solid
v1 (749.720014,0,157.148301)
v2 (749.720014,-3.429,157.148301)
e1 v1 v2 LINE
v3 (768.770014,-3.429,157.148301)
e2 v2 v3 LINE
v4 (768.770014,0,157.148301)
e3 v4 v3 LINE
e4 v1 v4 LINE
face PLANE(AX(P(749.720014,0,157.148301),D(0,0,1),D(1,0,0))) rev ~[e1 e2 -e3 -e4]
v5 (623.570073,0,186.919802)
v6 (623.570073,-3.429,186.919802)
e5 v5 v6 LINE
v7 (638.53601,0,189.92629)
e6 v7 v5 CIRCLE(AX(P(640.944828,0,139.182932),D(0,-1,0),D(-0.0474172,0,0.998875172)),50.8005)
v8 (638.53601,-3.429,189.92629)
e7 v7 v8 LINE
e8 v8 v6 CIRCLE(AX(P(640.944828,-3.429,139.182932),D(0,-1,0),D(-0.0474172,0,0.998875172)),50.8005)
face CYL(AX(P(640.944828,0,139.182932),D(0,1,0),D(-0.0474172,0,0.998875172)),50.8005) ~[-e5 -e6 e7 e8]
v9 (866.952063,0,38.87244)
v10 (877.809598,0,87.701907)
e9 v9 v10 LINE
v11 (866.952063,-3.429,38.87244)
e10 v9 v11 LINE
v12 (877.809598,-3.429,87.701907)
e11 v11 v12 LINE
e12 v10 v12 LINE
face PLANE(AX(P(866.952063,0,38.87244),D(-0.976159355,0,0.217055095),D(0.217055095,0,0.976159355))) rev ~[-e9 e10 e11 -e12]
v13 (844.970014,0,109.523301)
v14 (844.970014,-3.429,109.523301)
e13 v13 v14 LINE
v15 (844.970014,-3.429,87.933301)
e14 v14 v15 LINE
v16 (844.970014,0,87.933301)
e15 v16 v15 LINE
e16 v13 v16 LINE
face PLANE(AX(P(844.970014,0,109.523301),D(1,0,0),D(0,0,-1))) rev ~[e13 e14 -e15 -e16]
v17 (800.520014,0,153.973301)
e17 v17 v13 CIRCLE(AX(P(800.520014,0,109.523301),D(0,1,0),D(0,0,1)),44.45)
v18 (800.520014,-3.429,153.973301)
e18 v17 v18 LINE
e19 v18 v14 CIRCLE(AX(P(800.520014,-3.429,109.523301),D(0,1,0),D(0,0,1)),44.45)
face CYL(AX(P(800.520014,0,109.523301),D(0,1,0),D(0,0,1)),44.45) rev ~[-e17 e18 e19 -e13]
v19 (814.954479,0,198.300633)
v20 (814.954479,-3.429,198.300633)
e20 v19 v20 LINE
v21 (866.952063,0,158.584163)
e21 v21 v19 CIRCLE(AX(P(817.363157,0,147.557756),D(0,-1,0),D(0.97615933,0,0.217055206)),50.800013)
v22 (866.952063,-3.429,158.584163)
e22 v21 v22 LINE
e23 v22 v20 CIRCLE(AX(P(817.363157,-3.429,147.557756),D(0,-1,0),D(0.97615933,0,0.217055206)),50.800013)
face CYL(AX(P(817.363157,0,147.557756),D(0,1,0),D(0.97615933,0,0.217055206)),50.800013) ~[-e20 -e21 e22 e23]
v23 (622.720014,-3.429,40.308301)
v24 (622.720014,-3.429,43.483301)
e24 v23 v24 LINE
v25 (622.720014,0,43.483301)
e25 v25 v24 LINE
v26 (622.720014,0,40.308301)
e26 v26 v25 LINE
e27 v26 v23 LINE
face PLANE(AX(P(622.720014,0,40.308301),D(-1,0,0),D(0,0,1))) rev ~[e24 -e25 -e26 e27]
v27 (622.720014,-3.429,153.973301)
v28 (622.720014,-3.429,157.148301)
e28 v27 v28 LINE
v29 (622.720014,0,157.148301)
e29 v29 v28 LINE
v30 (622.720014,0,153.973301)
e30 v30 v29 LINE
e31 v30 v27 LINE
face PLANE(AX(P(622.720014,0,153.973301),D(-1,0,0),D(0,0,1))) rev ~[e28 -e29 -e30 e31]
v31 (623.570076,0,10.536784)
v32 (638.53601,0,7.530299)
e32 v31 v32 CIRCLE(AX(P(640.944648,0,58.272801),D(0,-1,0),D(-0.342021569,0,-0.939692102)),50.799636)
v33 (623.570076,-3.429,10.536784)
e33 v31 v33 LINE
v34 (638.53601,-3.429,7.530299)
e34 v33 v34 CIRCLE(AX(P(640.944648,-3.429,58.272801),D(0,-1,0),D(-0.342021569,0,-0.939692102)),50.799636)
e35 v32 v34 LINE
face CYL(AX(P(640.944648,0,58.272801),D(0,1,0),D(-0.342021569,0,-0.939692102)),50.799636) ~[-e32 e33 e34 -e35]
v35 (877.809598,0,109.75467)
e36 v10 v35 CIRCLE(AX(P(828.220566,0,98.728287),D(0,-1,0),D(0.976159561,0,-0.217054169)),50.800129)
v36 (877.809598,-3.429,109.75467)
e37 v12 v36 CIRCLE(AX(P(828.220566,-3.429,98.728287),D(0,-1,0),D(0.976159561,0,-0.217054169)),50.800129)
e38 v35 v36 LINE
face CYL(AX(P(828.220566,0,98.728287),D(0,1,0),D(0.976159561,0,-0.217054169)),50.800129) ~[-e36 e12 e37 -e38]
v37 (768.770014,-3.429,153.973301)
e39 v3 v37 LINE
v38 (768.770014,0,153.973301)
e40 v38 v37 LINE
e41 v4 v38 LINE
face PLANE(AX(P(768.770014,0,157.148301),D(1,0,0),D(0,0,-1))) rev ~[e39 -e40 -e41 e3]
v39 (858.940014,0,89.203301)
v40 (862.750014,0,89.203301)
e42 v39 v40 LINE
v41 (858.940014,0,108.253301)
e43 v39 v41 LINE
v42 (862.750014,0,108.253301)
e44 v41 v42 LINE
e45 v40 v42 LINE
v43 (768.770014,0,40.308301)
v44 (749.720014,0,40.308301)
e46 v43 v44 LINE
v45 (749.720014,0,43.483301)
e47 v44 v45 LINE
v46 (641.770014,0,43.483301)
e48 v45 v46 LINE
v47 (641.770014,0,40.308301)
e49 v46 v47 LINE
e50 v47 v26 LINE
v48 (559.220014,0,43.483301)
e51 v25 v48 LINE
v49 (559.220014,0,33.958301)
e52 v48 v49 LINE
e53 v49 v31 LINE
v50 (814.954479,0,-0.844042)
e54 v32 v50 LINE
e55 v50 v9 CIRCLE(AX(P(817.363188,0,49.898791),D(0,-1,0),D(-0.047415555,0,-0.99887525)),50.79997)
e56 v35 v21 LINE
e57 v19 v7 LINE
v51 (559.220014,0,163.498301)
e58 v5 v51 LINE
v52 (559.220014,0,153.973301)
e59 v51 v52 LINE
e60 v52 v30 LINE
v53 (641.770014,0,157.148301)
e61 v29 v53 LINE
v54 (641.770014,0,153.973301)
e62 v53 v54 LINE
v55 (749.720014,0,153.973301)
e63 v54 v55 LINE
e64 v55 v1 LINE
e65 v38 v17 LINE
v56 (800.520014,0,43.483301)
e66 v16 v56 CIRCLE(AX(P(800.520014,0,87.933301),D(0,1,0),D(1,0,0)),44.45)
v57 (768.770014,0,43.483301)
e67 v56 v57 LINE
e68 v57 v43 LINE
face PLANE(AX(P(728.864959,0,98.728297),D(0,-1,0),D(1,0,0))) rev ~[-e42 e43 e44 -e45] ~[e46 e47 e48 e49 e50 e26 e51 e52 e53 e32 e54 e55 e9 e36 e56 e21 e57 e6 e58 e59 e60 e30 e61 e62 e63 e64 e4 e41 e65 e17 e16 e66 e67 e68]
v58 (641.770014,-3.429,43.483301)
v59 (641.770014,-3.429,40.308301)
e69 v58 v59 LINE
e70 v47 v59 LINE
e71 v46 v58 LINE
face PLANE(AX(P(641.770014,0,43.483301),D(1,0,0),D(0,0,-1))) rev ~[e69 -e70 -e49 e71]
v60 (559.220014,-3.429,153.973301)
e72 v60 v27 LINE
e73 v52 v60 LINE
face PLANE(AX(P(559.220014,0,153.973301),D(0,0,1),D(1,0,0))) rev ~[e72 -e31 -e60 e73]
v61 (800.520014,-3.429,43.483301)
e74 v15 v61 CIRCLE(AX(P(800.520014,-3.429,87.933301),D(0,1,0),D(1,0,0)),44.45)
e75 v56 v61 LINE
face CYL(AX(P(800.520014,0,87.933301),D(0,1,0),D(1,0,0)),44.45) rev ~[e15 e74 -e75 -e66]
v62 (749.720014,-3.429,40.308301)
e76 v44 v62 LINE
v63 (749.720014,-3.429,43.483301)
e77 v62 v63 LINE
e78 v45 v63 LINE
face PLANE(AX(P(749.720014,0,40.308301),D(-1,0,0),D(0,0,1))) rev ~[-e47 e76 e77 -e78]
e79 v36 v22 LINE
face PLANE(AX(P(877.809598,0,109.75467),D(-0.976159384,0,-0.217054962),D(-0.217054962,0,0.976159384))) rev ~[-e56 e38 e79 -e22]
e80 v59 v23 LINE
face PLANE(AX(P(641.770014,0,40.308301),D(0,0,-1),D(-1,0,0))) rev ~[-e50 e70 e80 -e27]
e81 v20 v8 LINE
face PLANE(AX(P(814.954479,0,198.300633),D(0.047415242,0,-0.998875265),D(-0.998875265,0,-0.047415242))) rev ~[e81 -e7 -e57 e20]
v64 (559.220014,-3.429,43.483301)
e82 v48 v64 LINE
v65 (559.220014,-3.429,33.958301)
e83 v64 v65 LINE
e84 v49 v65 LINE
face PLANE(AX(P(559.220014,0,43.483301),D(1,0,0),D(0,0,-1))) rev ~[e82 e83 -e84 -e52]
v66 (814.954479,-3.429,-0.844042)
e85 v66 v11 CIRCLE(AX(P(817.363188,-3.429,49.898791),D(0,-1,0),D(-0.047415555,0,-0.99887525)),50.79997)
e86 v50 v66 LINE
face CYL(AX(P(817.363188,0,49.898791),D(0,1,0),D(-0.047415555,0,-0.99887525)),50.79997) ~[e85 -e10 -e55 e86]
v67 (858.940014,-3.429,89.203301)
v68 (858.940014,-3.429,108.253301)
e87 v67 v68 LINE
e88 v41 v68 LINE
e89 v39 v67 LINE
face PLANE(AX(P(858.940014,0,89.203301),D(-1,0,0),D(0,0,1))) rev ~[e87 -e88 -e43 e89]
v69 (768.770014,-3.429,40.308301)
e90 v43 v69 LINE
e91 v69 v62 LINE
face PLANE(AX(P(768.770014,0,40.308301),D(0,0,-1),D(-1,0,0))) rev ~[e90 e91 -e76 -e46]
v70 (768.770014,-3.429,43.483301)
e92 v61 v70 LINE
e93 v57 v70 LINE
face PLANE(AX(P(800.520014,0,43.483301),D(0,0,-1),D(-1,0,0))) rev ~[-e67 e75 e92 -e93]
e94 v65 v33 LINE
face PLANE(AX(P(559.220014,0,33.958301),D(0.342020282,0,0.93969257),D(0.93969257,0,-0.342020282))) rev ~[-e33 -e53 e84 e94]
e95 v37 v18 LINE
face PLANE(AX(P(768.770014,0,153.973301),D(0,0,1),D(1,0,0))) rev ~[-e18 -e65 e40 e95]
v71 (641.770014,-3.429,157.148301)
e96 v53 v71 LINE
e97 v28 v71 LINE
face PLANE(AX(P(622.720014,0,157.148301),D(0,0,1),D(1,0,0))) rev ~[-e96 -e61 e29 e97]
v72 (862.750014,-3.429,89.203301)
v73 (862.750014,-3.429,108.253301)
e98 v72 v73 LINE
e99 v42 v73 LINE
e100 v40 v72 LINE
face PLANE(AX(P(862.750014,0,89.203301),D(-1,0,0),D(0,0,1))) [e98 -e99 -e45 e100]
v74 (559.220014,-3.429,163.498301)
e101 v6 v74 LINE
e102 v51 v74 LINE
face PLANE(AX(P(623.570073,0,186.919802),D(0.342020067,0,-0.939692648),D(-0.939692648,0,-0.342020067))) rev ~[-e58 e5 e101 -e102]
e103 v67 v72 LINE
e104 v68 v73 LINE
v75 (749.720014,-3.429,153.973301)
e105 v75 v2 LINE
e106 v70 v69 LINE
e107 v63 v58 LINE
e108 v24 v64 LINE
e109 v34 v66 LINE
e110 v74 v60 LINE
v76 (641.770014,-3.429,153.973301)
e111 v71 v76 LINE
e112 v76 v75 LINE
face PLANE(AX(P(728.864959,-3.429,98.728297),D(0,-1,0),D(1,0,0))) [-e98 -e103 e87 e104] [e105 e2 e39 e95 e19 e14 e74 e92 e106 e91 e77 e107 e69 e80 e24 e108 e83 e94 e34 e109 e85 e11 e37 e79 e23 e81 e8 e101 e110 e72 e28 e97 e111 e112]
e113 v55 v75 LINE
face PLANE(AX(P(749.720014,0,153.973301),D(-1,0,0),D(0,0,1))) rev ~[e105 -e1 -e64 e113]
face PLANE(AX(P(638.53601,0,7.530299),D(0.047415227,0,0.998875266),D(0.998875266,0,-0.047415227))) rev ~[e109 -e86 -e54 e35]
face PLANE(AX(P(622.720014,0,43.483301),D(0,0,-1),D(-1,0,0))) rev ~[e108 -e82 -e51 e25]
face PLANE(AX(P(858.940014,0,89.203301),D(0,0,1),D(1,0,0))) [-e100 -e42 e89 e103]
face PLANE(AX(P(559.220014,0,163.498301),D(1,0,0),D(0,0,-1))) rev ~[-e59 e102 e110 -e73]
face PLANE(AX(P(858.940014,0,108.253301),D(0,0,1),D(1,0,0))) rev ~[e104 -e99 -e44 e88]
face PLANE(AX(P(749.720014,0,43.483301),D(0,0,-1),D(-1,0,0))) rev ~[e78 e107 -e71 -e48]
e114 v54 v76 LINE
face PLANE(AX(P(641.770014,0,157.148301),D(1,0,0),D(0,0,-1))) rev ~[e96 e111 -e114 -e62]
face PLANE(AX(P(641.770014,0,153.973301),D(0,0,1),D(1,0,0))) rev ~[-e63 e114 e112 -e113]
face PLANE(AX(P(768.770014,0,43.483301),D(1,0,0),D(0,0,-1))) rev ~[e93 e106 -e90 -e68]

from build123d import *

# Parameters (mm, degrees)
F0_W     = 3.81
F0_H     = 19.05
F1_DEPTH = 3.429


# Not quite as in the source:
# - ends of sketch curves that miss each other by under 0.0002 mm in the source are joined


with BuildPart() as f1:
    # F0 (on Front) → F1 (new body)
    with BuildSketch(Plane.XZ):
        with BuildLine():
            Line((641.7700144, 153.9733014), (749.7200144, 153.9733014))
            Line((749.7200144, 153.9733014), (749.7200144, 157.1483014))
            Line((749.7200144, 157.1483014), (768.7700144, 157.1483014))
            Line((768.7700144, 157.1483014), (768.7700144, 153.9733014))
            Line((768.7700144, 153.9733014), (800.5200144, 153.9733014))
            ThreePointArc((800.5200144, 153.9733014), (831.9509108237, 140.9541978237), (844.9700144, 109.5233014))
            Line((844.9700144, 109.5233014), (844.9700144, 87.9333014))
            ThreePointArc((844.9700144, 87.9333014), (831.9509108237, 56.5024049763), (800.5200144, 43.4833014))
            Line((800.5200144, 43.4833014), (768.7700144, 43.4833014))
            Line((768.7700144, 43.4833014), (768.7700144, 40.3083014))
            Line((768.7700144, 40.3083014), (749.7200144, 40.3083014))
            Line((749.7200144, 40.3083014), (749.7200144, 43.4833014))
            Line((749.7200144, 43.4833014), (641.7700144, 43.4833014))
            Line((641.7700144, 43.4833014), (641.7700144, 40.3083014))
            Line((641.7700144, 40.3083014), (622.7200144, 40.3083014))
            Line((622.7200144, 40.3083014), (622.7200144, 43.4833014))
            Line((622.7200144, 43.4833014), (559.2200144, 43.4833014))
            Line((559.2200144, 43.4833014), (559.2200144, 33.9583014))
            Line((559.2200144, 33.9583014), (623.5700762, 10.5367836))
            ThreePointArc((623.5700762, 10.5367836), (630.9394695232, 8.4681877562), (638.536009535, 7.5302985912))
            Line((638.536009535, 7.5302985912), (814.9544788, -0.844042))
            ThreePointArc((814.9544788, -0.844042), (848.1989075574, 9.5280670864), (866.95206277, 38.8724395401))
            Line((866.95206277, 38.8724395401), (877.8095982, 87.7019074))
            ThreePointArc((877.8095982, 87.7019074), (879.0206956, 98.7282890028), (877.80959757, 109.7546698599))
            Line((877.80959757, 109.7546698599), (866.9520634, 158.5841634))
            ThreePointArc((866.9520634, 158.5841634), (848.1988981839, 187.9285174732), (814.954479338, 198.3006334659))
            Line((814.954479338, 198.3006334659), (638.5360102, 189.9262902))
            ThreePointArc((638.5360102, 189.9262902), (630.9394701135, 188.9883897624), (623.5700733762, 186.9198015582))
            Line((623.5700733762, 186.9198015582), (559.2200144, 163.4983014))
            Line((559.2200144, 163.4983014), (559.2200144, 153.9733014))
            Line((559.2200144, 153.9733014), (622.7200144, 153.9733014))
            Line((622.7200144, 153.9733014), (622.7200144, 157.1483014))
            Line((622.7200144, 157.1483014), (641.7700144, 157.1483014))
            Line((641.7700144, 157.1483014), (641.7700144, 153.9733014))
        make_face()
        with Locations((860.8450144, 98.7283014)):
            Rectangle(F0_W, F0_H, mode=Mode.SUBTRACT)
    extrude(amount=F1_DEPTH)


solid = f1.part
